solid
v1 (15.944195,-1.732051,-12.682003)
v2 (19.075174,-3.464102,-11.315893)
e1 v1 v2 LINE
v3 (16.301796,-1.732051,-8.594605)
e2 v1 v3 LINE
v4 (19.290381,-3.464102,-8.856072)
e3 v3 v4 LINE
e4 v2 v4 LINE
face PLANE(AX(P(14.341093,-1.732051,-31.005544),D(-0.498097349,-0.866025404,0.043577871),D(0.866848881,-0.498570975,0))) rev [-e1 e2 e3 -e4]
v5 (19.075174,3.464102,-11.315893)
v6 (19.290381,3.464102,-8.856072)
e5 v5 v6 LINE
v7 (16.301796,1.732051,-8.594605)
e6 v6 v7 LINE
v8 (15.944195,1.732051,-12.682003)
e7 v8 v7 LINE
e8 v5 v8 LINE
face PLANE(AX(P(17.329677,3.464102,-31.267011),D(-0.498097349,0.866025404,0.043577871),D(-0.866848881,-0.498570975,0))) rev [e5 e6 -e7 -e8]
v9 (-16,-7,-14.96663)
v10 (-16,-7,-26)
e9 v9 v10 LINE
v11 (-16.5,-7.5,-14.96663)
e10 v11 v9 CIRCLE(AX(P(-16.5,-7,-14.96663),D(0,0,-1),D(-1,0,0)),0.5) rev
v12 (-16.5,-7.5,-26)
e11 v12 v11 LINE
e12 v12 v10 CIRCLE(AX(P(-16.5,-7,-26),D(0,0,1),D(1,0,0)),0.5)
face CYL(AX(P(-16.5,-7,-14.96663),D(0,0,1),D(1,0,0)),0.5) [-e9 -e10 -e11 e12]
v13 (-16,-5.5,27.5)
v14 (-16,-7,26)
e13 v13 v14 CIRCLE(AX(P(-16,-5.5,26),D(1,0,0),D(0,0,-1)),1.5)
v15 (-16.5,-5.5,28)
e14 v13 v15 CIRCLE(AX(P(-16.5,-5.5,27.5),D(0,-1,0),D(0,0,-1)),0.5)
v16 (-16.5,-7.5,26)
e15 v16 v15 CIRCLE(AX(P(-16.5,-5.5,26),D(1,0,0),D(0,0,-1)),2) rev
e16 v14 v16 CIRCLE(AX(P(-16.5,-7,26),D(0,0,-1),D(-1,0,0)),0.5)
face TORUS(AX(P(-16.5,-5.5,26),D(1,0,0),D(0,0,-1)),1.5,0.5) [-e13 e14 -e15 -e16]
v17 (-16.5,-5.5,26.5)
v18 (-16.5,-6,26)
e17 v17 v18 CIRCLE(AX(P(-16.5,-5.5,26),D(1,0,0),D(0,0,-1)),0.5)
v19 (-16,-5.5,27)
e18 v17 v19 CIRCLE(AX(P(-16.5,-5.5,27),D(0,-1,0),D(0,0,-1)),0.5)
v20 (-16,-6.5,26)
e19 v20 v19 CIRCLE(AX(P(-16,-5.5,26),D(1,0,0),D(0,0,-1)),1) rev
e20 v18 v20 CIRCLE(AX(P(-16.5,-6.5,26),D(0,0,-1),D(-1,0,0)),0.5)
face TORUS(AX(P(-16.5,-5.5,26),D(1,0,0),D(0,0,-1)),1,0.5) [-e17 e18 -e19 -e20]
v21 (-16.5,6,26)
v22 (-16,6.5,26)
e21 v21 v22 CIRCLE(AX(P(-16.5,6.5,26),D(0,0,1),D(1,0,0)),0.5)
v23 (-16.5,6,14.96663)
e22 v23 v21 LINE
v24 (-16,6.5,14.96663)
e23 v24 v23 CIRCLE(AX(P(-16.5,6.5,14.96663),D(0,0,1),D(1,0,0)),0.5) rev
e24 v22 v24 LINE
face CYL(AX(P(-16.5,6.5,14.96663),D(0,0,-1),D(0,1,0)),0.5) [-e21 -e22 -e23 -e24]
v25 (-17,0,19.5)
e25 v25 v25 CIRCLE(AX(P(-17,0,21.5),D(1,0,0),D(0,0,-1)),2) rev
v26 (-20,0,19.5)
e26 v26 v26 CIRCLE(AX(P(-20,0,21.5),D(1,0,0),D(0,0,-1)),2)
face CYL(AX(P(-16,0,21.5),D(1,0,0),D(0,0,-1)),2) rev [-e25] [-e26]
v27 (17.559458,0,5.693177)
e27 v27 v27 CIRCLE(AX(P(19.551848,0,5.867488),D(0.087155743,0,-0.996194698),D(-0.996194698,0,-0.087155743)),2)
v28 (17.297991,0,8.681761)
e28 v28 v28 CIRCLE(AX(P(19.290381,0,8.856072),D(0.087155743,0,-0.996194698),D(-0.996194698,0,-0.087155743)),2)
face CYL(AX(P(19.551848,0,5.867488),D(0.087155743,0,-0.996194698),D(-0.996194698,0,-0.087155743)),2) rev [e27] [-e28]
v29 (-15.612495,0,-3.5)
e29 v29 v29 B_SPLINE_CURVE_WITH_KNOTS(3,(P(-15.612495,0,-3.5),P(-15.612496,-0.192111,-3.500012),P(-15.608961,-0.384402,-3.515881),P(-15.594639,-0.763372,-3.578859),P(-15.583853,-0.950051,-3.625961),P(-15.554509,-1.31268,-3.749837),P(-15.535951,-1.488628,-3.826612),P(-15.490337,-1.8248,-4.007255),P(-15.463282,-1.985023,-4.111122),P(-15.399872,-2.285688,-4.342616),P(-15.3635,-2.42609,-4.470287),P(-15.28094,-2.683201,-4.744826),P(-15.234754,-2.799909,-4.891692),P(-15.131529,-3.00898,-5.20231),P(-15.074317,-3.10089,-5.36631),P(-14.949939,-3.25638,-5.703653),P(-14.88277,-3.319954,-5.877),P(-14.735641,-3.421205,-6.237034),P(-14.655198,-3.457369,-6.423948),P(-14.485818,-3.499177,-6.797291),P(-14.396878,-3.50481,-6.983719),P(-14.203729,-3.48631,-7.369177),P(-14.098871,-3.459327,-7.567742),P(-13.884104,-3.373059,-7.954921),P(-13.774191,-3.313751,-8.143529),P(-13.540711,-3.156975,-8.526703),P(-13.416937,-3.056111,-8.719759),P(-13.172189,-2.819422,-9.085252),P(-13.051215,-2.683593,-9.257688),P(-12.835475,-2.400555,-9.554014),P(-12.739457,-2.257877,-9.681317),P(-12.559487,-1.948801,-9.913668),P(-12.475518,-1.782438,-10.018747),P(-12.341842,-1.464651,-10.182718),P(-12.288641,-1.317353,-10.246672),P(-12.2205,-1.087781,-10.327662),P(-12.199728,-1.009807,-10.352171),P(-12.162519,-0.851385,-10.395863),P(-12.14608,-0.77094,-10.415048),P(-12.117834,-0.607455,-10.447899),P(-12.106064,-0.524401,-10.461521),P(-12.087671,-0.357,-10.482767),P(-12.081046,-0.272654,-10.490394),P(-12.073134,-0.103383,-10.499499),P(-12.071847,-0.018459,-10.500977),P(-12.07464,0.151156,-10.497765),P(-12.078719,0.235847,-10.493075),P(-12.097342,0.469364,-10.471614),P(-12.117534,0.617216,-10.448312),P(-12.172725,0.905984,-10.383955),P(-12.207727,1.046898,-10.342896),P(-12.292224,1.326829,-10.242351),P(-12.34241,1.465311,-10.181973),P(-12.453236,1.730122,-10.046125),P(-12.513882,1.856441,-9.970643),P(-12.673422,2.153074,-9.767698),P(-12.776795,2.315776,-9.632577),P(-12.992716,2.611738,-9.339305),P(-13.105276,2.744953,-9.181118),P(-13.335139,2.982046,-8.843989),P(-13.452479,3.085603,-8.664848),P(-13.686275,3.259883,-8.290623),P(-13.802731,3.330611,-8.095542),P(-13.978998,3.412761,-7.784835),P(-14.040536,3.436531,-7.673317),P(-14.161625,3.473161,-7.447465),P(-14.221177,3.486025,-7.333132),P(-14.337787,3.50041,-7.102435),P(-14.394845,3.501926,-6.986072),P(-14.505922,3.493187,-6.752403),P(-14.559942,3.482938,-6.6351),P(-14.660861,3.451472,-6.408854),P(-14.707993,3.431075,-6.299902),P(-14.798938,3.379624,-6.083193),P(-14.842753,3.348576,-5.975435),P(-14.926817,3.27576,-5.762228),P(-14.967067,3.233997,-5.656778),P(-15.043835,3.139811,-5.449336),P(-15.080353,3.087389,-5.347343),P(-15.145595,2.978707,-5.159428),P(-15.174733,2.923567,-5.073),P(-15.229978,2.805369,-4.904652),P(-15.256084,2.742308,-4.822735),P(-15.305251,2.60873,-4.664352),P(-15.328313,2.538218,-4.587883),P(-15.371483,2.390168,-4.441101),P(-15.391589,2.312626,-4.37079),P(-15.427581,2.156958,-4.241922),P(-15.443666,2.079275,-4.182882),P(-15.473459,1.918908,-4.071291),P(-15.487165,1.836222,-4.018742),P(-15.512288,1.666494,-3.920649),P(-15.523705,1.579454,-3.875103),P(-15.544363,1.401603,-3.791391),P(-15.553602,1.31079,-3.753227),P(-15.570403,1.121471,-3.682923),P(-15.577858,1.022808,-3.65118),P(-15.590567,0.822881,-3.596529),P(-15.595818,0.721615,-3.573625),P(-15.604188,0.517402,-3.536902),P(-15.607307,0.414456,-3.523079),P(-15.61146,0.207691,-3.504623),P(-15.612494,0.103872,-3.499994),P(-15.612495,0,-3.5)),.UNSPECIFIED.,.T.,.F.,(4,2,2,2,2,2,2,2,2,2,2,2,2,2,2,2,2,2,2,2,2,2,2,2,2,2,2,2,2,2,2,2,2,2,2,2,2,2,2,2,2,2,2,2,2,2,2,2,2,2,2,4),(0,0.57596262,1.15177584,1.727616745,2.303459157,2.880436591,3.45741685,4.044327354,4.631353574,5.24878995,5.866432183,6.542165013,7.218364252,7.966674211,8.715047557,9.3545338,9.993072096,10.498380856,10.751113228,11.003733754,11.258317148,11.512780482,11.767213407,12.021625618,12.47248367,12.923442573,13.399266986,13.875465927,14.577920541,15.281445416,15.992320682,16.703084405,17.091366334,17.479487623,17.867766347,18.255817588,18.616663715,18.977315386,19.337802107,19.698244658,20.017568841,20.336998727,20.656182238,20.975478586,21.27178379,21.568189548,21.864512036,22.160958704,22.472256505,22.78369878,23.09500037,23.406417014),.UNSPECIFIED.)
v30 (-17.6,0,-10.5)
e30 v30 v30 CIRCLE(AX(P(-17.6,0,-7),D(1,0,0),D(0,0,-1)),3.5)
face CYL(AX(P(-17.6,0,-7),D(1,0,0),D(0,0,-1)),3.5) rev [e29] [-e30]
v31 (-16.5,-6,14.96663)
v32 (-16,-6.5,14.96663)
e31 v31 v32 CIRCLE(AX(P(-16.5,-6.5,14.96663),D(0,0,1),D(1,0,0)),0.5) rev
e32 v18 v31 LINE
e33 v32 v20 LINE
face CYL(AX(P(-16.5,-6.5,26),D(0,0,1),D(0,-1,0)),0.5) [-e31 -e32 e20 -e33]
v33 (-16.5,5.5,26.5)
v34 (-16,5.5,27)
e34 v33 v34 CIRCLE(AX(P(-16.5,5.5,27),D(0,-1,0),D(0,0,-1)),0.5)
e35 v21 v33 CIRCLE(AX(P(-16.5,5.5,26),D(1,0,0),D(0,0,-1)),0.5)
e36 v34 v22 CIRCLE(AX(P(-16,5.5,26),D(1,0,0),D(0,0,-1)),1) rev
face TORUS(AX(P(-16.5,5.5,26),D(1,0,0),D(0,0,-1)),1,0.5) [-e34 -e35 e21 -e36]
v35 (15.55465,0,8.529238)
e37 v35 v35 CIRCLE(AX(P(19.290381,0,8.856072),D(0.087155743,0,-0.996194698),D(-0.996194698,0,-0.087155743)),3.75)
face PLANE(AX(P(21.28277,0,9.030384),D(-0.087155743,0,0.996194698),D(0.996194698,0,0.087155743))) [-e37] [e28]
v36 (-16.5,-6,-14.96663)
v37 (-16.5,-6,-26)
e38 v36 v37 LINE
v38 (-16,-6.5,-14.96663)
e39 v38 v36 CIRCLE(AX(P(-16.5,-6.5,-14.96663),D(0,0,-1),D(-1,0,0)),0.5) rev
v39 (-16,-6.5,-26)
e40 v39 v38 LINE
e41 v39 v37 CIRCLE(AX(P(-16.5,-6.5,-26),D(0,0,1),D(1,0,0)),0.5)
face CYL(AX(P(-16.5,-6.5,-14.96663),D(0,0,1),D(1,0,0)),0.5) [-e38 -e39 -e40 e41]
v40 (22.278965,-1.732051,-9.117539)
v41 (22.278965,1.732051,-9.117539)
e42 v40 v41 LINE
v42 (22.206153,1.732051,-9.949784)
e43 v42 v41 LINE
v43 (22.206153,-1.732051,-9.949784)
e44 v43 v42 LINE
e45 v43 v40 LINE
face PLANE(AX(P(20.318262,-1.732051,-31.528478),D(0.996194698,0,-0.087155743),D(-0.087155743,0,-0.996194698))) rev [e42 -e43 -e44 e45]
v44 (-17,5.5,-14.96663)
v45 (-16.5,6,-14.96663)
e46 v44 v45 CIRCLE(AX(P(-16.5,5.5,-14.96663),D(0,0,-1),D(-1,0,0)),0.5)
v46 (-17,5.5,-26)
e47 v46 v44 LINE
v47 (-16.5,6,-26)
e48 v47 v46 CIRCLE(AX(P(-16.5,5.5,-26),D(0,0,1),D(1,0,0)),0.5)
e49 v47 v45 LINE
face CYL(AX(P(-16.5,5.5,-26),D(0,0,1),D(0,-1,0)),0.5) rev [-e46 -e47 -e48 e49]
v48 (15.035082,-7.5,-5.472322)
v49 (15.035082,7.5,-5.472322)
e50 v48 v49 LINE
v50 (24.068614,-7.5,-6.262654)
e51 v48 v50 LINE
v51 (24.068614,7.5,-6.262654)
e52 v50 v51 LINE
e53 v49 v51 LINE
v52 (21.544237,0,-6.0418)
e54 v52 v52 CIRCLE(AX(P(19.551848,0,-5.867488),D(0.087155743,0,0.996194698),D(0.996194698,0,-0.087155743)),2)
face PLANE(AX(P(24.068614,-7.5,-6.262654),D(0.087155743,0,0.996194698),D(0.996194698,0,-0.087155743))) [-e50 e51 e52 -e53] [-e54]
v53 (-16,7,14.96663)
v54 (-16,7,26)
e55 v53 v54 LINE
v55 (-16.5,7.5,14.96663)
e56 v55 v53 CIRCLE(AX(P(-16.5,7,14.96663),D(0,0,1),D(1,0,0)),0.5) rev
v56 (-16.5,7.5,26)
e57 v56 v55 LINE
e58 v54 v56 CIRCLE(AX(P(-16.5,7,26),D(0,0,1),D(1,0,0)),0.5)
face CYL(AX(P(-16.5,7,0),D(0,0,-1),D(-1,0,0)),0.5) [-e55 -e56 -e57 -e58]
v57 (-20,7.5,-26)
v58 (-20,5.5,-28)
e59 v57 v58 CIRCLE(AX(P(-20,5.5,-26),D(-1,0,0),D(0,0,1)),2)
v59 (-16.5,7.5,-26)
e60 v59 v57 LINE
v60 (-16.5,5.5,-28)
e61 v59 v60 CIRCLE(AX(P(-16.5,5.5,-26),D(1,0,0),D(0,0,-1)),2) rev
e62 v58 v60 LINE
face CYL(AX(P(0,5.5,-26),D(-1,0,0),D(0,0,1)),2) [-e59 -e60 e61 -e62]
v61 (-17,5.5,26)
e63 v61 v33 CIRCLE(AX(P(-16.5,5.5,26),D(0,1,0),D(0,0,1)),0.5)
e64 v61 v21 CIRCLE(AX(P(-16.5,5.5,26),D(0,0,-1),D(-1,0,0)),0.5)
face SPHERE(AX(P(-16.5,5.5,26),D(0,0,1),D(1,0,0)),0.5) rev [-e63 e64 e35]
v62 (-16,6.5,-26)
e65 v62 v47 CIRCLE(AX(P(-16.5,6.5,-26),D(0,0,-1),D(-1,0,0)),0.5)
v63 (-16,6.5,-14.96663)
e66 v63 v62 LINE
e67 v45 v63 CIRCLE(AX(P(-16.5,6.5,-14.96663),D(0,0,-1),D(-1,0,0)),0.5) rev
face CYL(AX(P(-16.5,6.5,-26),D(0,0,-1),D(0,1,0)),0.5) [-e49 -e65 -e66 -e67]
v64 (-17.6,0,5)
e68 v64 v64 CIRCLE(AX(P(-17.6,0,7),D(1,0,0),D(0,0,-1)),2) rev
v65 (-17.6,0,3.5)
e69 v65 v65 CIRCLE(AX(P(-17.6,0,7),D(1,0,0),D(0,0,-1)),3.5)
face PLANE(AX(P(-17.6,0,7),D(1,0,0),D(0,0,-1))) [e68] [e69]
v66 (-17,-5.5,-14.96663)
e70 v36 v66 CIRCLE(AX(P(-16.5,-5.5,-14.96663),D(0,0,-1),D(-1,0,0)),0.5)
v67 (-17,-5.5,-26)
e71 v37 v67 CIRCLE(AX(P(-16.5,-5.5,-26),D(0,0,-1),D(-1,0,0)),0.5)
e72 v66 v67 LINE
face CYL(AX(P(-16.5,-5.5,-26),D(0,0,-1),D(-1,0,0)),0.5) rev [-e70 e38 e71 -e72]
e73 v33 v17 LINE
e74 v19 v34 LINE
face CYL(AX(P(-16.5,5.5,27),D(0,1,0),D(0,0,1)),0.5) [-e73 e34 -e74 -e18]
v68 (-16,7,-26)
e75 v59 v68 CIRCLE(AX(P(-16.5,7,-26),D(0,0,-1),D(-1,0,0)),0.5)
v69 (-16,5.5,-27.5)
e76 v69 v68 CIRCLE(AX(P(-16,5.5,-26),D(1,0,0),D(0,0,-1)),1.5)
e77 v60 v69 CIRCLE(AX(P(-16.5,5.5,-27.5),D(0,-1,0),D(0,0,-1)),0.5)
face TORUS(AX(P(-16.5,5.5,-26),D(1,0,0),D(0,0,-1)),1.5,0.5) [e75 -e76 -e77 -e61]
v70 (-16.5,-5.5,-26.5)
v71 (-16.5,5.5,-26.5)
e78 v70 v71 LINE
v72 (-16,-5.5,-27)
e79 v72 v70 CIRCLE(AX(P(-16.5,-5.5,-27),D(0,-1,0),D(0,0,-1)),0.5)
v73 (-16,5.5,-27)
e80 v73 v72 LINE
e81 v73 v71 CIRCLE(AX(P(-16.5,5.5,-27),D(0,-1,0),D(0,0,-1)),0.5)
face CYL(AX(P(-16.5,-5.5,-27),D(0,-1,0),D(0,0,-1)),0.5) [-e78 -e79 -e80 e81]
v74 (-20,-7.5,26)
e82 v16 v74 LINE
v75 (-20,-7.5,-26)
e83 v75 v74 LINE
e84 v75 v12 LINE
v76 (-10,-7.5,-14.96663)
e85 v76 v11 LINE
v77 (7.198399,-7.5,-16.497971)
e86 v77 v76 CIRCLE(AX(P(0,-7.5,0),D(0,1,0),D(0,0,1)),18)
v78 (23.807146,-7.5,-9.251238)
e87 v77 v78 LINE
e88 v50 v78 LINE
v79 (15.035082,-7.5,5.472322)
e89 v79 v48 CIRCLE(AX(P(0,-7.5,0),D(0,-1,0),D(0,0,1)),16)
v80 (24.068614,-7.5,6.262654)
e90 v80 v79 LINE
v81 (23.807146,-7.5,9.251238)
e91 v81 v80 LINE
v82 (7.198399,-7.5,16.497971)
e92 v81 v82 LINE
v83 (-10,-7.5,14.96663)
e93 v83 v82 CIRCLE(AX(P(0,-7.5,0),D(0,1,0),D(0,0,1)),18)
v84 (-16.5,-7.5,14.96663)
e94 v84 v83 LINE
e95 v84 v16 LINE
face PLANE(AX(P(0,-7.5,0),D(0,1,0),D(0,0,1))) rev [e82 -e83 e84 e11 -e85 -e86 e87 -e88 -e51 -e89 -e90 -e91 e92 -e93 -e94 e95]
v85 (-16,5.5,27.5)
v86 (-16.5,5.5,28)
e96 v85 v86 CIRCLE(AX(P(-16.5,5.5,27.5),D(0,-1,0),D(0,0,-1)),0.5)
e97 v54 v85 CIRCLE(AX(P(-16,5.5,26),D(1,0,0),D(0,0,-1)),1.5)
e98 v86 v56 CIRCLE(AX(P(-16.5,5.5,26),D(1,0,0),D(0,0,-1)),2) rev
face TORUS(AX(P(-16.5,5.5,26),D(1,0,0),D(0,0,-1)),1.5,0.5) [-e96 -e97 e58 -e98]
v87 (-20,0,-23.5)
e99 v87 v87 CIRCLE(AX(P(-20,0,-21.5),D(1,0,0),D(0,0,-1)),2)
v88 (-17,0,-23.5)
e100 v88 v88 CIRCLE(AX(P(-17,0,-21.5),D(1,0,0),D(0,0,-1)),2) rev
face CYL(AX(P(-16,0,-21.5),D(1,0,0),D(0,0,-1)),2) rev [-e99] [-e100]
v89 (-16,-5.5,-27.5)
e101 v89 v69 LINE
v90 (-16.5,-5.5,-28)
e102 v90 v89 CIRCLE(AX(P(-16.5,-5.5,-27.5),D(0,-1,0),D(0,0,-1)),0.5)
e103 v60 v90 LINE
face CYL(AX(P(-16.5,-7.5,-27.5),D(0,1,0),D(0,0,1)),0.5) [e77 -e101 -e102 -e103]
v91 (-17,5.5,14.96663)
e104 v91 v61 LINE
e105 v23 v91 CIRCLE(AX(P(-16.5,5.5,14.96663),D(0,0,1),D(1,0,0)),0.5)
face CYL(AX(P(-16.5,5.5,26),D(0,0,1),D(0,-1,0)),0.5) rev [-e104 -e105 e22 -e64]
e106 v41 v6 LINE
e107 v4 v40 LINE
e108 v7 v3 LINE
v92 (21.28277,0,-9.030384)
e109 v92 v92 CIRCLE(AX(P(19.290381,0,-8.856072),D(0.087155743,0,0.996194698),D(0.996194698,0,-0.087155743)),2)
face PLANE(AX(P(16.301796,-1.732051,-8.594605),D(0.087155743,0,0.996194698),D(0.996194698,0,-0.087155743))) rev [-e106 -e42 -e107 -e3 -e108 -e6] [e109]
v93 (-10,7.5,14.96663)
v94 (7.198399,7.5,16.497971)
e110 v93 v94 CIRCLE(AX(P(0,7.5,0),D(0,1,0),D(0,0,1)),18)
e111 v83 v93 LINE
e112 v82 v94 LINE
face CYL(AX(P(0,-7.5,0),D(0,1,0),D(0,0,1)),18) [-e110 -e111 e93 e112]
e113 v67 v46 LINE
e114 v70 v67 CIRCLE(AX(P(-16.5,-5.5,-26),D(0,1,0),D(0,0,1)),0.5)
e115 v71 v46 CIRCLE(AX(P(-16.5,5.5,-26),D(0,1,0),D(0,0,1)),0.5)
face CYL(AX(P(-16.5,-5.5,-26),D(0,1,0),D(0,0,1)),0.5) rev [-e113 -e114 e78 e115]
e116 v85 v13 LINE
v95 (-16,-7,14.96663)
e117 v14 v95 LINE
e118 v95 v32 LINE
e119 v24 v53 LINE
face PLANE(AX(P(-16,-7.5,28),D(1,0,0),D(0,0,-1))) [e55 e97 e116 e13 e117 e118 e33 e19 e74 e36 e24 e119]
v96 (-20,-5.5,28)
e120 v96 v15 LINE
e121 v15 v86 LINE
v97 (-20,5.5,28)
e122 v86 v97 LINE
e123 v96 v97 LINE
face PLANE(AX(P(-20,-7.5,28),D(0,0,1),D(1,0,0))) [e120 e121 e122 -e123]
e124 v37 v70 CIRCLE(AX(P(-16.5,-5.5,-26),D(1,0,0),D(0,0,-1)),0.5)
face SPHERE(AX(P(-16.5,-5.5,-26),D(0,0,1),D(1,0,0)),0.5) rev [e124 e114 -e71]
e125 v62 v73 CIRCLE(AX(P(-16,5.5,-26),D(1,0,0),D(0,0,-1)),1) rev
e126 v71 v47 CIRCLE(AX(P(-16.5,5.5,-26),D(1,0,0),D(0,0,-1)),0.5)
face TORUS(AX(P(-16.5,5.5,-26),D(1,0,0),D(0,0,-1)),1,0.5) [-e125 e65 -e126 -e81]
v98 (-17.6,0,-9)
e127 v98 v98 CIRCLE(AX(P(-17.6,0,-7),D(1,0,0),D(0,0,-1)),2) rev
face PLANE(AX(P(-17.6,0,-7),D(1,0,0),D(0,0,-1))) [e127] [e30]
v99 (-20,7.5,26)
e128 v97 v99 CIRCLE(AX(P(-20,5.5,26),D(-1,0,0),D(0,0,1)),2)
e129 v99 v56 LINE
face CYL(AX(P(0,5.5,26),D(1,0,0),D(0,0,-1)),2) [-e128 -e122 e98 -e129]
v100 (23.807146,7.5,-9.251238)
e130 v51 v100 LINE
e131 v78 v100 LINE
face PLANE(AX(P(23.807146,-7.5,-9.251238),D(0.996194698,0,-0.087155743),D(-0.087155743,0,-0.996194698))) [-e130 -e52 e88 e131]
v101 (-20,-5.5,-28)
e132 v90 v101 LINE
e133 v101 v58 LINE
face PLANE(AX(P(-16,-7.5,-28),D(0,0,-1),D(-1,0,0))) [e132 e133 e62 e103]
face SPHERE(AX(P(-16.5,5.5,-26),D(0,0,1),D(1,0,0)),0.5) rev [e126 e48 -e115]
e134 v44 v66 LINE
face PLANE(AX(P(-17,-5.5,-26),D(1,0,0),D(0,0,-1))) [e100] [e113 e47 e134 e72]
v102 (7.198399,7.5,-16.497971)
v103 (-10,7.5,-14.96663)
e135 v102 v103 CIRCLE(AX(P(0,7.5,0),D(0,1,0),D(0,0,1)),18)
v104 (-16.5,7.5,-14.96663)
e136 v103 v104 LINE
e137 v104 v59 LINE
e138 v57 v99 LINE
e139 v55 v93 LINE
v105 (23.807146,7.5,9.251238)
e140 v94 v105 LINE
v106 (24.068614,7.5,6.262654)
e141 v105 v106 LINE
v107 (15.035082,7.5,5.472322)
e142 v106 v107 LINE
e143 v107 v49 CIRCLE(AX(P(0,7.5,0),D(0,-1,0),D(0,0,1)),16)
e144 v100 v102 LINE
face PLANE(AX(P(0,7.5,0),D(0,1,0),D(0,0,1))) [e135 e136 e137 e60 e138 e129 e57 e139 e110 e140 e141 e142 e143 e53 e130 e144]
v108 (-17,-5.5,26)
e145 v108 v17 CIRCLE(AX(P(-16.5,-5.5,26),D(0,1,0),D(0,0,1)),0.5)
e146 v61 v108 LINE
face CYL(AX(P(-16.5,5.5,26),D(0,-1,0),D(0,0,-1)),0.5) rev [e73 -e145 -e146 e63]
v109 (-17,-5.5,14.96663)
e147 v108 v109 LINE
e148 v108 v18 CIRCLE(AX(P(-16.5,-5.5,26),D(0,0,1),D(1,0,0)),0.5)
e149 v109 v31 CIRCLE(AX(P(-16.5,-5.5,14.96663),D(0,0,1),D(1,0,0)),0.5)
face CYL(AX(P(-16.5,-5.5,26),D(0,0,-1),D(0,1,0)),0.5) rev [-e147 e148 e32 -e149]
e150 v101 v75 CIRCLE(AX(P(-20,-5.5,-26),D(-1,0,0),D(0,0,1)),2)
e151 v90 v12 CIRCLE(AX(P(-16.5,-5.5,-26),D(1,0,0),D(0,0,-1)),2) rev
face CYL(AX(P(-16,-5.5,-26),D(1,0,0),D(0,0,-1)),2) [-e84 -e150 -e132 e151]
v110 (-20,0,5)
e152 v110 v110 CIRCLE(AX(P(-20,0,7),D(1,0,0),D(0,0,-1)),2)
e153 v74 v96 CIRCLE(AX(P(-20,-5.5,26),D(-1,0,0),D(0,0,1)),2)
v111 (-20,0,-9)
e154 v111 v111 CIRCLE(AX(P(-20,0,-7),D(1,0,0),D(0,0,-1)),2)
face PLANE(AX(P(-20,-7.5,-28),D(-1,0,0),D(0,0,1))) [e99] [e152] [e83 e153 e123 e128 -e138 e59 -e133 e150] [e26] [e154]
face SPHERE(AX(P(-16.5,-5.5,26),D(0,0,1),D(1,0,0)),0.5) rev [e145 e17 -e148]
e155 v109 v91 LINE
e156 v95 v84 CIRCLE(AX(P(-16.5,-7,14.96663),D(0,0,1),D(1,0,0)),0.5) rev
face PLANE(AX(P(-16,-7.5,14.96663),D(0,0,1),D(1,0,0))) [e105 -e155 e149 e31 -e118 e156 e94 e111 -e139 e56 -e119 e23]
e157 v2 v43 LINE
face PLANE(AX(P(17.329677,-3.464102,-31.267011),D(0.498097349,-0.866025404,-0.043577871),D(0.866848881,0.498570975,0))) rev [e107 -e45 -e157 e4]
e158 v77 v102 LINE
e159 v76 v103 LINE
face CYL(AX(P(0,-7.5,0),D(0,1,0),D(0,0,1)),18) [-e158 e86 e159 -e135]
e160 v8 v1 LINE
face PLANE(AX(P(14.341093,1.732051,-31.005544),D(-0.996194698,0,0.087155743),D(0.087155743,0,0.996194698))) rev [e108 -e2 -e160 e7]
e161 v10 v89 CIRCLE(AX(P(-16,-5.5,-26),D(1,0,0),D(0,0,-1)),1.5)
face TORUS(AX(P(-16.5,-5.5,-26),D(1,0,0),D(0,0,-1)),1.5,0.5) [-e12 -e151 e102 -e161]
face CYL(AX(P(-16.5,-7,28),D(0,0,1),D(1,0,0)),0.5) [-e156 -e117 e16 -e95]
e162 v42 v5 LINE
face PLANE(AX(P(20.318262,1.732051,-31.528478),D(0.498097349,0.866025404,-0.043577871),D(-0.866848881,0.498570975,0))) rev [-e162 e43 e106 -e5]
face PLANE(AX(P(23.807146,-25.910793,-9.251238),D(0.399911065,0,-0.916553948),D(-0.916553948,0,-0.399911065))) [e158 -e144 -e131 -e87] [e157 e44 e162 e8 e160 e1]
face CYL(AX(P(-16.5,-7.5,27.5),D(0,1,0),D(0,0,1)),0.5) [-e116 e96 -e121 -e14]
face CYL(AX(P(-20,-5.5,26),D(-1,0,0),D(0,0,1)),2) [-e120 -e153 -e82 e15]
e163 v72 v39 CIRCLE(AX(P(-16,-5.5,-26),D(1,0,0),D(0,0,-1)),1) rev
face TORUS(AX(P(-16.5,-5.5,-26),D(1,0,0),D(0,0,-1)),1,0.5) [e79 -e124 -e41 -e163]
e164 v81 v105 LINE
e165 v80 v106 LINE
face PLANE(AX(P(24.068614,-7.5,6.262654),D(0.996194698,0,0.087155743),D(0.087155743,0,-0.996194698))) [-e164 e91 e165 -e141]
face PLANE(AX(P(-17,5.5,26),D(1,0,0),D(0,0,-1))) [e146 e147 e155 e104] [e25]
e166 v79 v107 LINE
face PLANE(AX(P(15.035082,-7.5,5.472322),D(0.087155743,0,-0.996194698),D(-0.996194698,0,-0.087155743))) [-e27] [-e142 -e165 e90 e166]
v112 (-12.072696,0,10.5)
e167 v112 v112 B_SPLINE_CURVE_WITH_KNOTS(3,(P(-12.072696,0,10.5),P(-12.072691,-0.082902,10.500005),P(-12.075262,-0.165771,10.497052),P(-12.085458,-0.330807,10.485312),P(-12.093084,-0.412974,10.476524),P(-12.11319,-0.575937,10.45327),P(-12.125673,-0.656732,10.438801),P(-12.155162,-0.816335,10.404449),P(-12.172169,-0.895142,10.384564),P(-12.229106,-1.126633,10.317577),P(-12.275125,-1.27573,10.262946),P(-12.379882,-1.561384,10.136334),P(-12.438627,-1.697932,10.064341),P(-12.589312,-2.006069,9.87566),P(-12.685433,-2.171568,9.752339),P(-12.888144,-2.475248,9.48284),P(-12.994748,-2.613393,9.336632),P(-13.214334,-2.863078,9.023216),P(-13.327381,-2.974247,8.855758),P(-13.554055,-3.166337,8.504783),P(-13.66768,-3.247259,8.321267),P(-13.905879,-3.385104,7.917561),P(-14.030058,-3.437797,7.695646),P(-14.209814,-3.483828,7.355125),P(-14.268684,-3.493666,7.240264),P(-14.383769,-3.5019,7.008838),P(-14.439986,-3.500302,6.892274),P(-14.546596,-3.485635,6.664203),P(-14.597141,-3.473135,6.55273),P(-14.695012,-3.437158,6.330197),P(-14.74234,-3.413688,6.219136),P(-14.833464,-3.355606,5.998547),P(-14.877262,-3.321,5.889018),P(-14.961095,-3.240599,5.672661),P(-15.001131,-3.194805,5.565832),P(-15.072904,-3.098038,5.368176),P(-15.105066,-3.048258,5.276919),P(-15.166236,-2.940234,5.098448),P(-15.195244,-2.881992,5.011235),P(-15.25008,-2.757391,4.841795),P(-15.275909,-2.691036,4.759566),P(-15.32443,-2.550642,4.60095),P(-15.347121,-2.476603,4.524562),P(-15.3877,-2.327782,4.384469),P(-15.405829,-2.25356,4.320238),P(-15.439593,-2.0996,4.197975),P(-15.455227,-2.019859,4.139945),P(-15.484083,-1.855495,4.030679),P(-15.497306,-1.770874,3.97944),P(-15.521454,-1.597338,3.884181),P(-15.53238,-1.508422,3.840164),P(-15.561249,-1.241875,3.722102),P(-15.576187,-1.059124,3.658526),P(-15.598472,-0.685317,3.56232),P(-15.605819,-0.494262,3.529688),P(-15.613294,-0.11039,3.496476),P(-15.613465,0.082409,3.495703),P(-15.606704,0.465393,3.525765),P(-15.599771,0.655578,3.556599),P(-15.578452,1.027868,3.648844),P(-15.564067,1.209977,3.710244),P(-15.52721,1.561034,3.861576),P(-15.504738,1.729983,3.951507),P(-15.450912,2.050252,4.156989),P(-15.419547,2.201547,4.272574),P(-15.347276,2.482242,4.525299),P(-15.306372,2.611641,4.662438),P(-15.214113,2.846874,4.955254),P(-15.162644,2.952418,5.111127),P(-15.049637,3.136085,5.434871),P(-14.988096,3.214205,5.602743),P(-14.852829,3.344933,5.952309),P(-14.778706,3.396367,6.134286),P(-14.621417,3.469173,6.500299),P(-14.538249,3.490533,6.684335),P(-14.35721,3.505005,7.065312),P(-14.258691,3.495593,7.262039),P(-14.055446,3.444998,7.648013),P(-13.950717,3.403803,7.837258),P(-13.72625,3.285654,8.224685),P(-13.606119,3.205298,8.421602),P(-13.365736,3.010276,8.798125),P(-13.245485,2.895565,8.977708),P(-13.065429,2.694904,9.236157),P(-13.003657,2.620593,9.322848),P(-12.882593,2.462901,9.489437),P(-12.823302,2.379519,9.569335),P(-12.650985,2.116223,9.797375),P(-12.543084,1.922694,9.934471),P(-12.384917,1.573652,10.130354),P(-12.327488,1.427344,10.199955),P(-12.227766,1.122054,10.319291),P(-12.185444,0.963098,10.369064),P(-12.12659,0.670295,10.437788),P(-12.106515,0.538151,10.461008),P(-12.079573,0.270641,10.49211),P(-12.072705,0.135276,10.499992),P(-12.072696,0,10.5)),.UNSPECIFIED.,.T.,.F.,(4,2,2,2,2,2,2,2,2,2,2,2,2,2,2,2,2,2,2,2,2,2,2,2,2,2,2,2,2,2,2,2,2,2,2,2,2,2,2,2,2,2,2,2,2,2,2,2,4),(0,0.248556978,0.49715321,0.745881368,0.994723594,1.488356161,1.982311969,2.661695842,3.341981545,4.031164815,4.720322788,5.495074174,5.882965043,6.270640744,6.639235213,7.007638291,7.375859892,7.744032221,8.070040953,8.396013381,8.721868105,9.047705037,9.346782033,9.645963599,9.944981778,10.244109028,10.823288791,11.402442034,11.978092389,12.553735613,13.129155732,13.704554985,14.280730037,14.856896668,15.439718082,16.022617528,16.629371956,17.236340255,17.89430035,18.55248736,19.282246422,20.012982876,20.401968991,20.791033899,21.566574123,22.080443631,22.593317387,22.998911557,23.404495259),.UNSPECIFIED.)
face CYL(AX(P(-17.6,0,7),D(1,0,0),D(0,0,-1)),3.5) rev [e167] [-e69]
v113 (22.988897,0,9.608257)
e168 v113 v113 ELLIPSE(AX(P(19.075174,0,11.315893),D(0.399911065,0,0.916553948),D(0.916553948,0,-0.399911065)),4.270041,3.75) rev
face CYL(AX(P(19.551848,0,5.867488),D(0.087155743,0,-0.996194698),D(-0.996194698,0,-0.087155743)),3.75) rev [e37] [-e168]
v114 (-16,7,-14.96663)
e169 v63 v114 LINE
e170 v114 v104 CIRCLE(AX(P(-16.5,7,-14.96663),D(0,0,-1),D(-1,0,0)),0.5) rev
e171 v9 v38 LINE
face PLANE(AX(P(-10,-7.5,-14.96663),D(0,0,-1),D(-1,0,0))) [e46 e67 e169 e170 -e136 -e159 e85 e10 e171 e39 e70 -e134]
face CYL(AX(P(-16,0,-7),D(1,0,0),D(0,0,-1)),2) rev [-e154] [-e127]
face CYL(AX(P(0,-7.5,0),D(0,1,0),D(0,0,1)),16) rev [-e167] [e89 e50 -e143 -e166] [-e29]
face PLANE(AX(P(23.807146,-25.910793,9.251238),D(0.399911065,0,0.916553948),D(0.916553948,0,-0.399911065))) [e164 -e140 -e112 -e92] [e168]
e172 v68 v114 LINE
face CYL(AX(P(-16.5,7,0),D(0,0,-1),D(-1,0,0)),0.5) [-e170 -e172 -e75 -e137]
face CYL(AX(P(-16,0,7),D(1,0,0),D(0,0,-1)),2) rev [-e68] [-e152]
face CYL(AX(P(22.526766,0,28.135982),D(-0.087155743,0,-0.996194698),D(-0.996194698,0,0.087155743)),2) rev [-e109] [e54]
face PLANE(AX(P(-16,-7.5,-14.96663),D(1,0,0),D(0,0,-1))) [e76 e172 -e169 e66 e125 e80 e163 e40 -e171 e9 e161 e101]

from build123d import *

# Parameters (mm, degrees)
BOSS_EXTRUDE1_DEPTH               = 7.5
BOSS_EXTRUDE1_DEPTH_BACK          = 7.5
SKETCH4_W                         = 2
SKETCH4_H                         = 4
F_4_0_4_DIAMETER_HOLE1_AT_2_COUNT = 2
F_4_0_4_DIAMETER_HOLE1_AT_2_PITCH = 43
F_4_0_4_DIAMETER_HOLE1_AT_3_COUNT = 2
F_4_0_4_DIAMETER_HOLE1_AT_3_PITCH = 14.5
F_4_0_4_DIAMETER_HOLE1_AT_4_COUNT = 2
F_4_0_4_DIAMETER_HOLE1_AT_4_PITCH = 28.5
FILLET1_R                         = 2
CUT_EXTRUDE1_DEPTH                = 1
CUT_EXTRUDE5_REACH                = 52.268
CUT_EXTRUDE5_END_RADIUS           = 16
SKETCH15_R                        = 3.5
CUT_EXTRUDE5_DIRECTION_2_DEPTH    = 0.6
FILLET2_R                         = 0.5
BOSS_EXTRUDE2_START               = -7.5
BOSS_EXTRUDE2_DEPTH               = 15
CUT_EXTRUDE6_REACH                = 45.576
SKETCH17_R                        = 2
CUT_EXTRUDE7_REACH                = 45.576


with BuildPart() as part:
    # Sketch1 → Boss-Extrude1 (new, two sides: drawn at the far end of the back side and taken through both)
    with BuildSketch(Plane(origin=(0, 0, 0), x_dir=(1, 0, 0), z_dir=(0, 1, 0)).offset(-BOSS_EXTRUDE1_DEPTH_BACK)):
        with BuildLine():
            Line((-16, 14.966629547), (-16, 28))
            Line((-16, 28), (-20, 28))
            Line((-20, 28), (-20, -28))
            Line((-20, -28), (-16, -28))
            Line((-16, -28), (-16, -14.966629547))
            Line((-16, -14.966629547), (-10, -14.966629547))
            ThreePointArc((-10, -14.966629547), (4.335878308, -17.469978801), (15.837588826, -8.553992061))
            Line((15.837588826, -8.553992061), (23.80714641, -9.251238003))
            Line((23.80714641, -9.251238003), (24.068613639, -6.262653909))
            Line((24.068613639, -6.262653909), (15.035081933, -5.472322293))
            ThreePointArc((15.035081933, -5.472322293), (-16, 0), (15.035081933, 5.472322293))
            Line((15.035081933, 5.472322293), (24.068613639, 6.262653909))
            Line((24.068613639, 6.262653909), (23.80714641, 9.251238003))
            Line((23.80714641, 9.251238003), (15.837588826, 8.553992061))
            ThreePointArc((15.837588826, 8.553992061), (4.335878308, 17.469978801), (-10, 14.966629547))
            Line((-10, 14.966629547), (-16, 14.966629547))
        make_face()
    extrude(amount=BOSS_EXTRUDE1_DEPTH + BOSS_EXTRUDE1_DEPTH_BACK)

    # Sketch4 → Ø4.0 (4) Diameter Hole1 (revolve, cut)
    with BuildSketch(Plane(origin=(-16, 0, 21.5), x_dir=(0, 0, -1), z_dir=(0, 1, 0))):
        with Locations((1, 2)):
            Rectangle(SKETCH4_W, SKETCH4_H)
    f_4_0_4_diameter_hole1 = revolve(axis=Axis((-9.65, 0, 21.5), (-1, 0, 0)), mode=Mode.SUBTRACT)

    # Ø4.0 (4) Diameter Hole1 at 2: Ø4.0 (4) Diameter Hole1 ×2
    with Locations(*[(0, 0, -i * F_4_0_4_DIAMETER_HOLE1_AT_2_PITCH) for i in range(1, F_4_0_4_DIAMETER_HOLE1_AT_2_COUNT)]):
        add(f_4_0_4_diameter_hole1, mode=Mode.SUBTRACT)

    # Ø4.0 (4) Diameter Hole1 at 3: Ø4.0 (4) Diameter Hole1 ×2
    with Locations(*[(0, 0, -i * F_4_0_4_DIAMETER_HOLE1_AT_3_PITCH) for i in range(1, F_4_0_4_DIAMETER_HOLE1_AT_3_COUNT)]):
        add(f_4_0_4_diameter_hole1, mode=Mode.SUBTRACT)

    # Ø4.0 (4) Diameter Hole1 at 4: Ø4.0 (4) Diameter Hole1 ×2
    with Locations(*[(0, 0, -i * F_4_0_4_DIAMETER_HOLE1_AT_4_PITCH) for i in range(1, F_4_0_4_DIAMETER_HOLE1_AT_4_COUNT)]):
        add(f_4_0_4_diameter_hole1, mode=Mode.SUBTRACT)

    # Fillet1
    fillet1_edges = [part.edges().sort_by_distance(p)[0] for p in [
        (-18, -7.5, -28),
        (-18, -7.5, 28),
        (-18, 7.5, -28),
        (-18, 7.5, 28),
    ]]
    fillet(fillet1_edges, radius=FILLET1_R)

    # Sketch10 → Cut-Extrude1 (cut)
    with BuildSketch(Plane(origin=(-16, 0, 0), x_dir=(0, 0, -1), z_dir=(1, 0, 0))):
        with BuildLine():
            Line((14.966629547, 6), (14.966629547, -6))
            Line((14.966629547, -6), (26, -6))
            ThreePointArc((26, -6), (26.353553391, -5.853553391), (26.5, -5.5))
            Line((26.5, -5.5), (26.5, 5.5))
            ThreePointArc((26.5, 5.5), (26.353553391, 5.853553391), (26, 6))
            Line((26, 6), (14.966629547, 6))
        make_face()
        with BuildLine():
            Line((-14.966629547, 6), (-14.966629547, -6))
            Line((-14.966629547, -6), (-26, -6))
            ThreePointArc((-26, -6), (-26.353553391, -5.853553391), (-26.5, -5.5))
            Line((-26.5, -5.5), (-26.5, 5.5))
            ThreePointArc((-26.5, 5.5), (-26.353553391, 5.853553391), (-26, 6))
            Line((-26, 6), (-14.966629547, 6))
        make_face()
    extrude(amount=-CUT_EXTRUDE1_DEPTH, mode=Mode.SUBTRACT)

    # Cut-Extrude5: up to this cylinder (the profile starts outside it)
    cut_extrude5_end = Plane(origin=(0, 0, 0), z_dir=(0, 1, 0)) * Cylinder(CUT_EXTRUDE5_END_RADIUS, 137.536, mode=Mode.PRIVATE)
    # Sketch15 → Cut-Extrude5 (cut, up to the surface)
    with BuildSketch(Plane(origin=(-17, 0, 0), x_dir=(0, 0, -1), z_dir=(1, 0, 0)), mode=Mode.PRIVATE) as cut_extrude5_sk1:
        with Locations((7, 0)):
            Circle(SKETCH15_R)
    cut_extrude5_tool1 = extrude(cut_extrude5_sk1.sketch, amount=CUT_EXTRUDE5_REACH, mode=Mode.PRIVATE) - cut_extrude5_end
    add(cut_extrude5_tool1.solids().sort_by_distance((-17, 0, -7))[0], mode=Mode.SUBTRACT)
    # Sketch15 → Cut-Extrude5 (cut, up to the surface)
    with BuildSketch(Plane(origin=(-17, 0, 0), x_dir=(0, 0, -1), z_dir=(1, 0, 0)), mode=Mode.PRIVATE) as cut_extrude5_sk2:
        with Locations((-7, 0)):
            Circle(SKETCH15_R)
    cut_extrude5_tool2 = extrude(cut_extrude5_sk2.sketch, amount=CUT_EXTRUDE5_REACH, mode=Mode.PRIVATE) - cut_extrude5_end
    add(cut_extrude5_tool2.solids().sort_by_distance((-17, 0, 7))[0], mode=Mode.SUBTRACT)

    # Sketch15 → Cut-Extrude5 direction 2 (cut)
    with BuildSketch(Plane(origin=(-17, 0, 0), x_dir=(0, 0, -1), z_dir=(1, 0, 0))):
        with Locations((7, 0)):
            Circle(SKETCH15_R)
        with Locations((-7, 0)):
            Circle(SKETCH15_R)
    extrude(amount=-CUT_EXTRUDE5_DIRECTION_2_DEPTH, mode=Mode.SUBTRACT)

    # Fillet2
    fillet2_edges = [part.edges().sort_by_distance(p)[0] for p in [
        (-17, -6, -20.483314774),
        (-17, -5.853553391, -26.353553391),
        (-17, 0, -26.5),
        (-17, 5.853553391, -26.353553391),
        (-16, -6, -20.483314774),
        (-16, -5.853553391, -26.353553391),
        (-16, 6, -20.483314774),
        (-16, 5.853553391, -26.353553391),
        (-16, -7.5, -20.483314774),
        (-16, -6.914213562, -27.414213562),
        (-16, 7.5, -20.483314774),
        (-16, 6.914213562, -27.414213562),
        (-16, -7.5, 20.483314774),
        (-16, -6.914213562, 27.414213562),
        (-16, 0, 28),
        (-16, 6.914213562, 27.414213562),
        (-17, -6, 20.483314774),
        (-17, -5.853553391, 26.353553391),
        (-17, 0, 26.5),
        (-17, 5.853553391, 26.353553391),
        (-16, -6, 20.483314774),
        (-16, -5.853553391, 26.353553391),
        (-16, 0, 26.5),
        (-16, 5.853553391, 26.353553391),
        (-17, 6, -20.483314774),
        (-16, 0, -26.5),
        (-16, 0, -28),
        (-16, 7.5, 20.483314774),
        (-17, 6, 20.483314774),
        (-16, 6, 20.483314774),
    ]]
    fillet(fillet2_edges, radius=FILLET2_R - 0.0001)  # a hair under: the kernel refuses the full size

    # Sketch11 → Boss-Extrude2 (add)
    with BuildSketch(Plane(origin=(0, 0, 0), x_dir=(1, 0, 0), z_dir=(0, 1, 0)).offset(BOSS_EXTRUDE2_START)):
        with BuildLine():
            Line((23.80714641, -9.251238003), (7.198399175, -16.497971066))
            ThreePointArc((7.198399175, -16.497971066), (12.183631905, -13.24987221), (15.837588826, -8.553992061))
            Line((15.837588826, -8.553992061), (23.80714641, -9.251238003))
        make_face()
        with BuildLine():
            Line((23.80714641, 9.251238003), (7.198399175, 16.497971066))
            ThreePointArc((7.198399175, 16.497971066), (12.183631905, 13.24987221), (15.837588826, 8.553992061))
            Line((15.837588826, 8.553992061), (23.80714641, 9.251238003))
        make_face()
    extrude(amount=BOSS_EXTRUDE2_DEPTH)

    # Sketch16 → Cut-Revolve1 (revolve, cut)
    with BuildSketch(Plane(origin=(0, 0, 0), x_dir=(1, 0, 0), z_dir=(0, 1, 0)), mode=Mode.PRIVATE) as cut_revolve1_sk:
        Polygon((19.551847786, -5.867488101), (21.544237182, -6.041799587), (21.282769954, -9.030383681), (23.026110675, -9.182906231), (22.079695592, -20.000480134), (18.343965474, -19.673646099), align=None)
    revolve(cut_revolve1_sk.sketch.rotate(Axis((19.551847786, 0, 5.867488101), (-0.08715574274765382, 0, 0.996194698091746)), 180), axis=Axis((19.551847786, 0, 5.867488101), (-0.08715574274765382, 0, 0.996194698091746)), mode=Mode.SUBTRACT)

    # Sketch17 → Cut-Extrude6 (cut, up to next)
    with BuildSketch(Plane(origin=(-0.622388286, 0, -7.113930662), x_dir=(0.996194698091746, 0, -0.08715574274765478), z_dir=(0.08715574274765478, 0, 0.996194698091746)), mode=Mode.PRIVATE) as cut_extrude6_sk1:
        with Locations((19.988832385, 0)):
            Circle(SKETCH17_R)
    cut_extrude6_tool1 = extrude(cut_extrude6_sk1.sketch, amount=CUT_EXTRUDE6_REACH, mode=Mode.PRIVATE) & part.part
    add(cut_extrude6_tool1.solids().sort_by_distance((19.290381, 0, -8.856072))[0], mode=Mode.SUBTRACT)

    # Cut-Extrude7: up to this plane
    cut_extrude7_end = Plane(origin=(23.80714641, -25.910792681, -9.251238003), z_dir=(0.39991106530273124, 0, -0.9165539481385887))
    # Sketch18 → Cut-Extrude7 (cut, up to the surface)
    with BuildSketch(Plane(origin=(-0.622388286, 0, -7.113930662), x_dir=(0.996194698091746, 0, -0.08715574274765478), z_dir=(0.08715574274765478, 0, 0.996194698091746)), mode=Mode.PRIVATE) as cut_extrude7_sk1:
        Polygon((16.988832385, -1.732050808), (19.988832385, -3.464101615), (22.988832385, -1.732050808), (22.988832385, 1.732050808), (19.988832385, 3.464101615), (16.988832385, 1.732050808), align=None)
    cut_extrude7_tool1 = split(extrude(cut_extrude7_sk1.sketch, amount=-CUT_EXTRUDE7_REACH, mode=Mode.PRIVATE), bisect_by=cut_extrude7_end, keep=Keep.BOTH, mode=Mode.PRIVATE)
    add(cut_extrude7_tool1.solids().sort_by_distance((19.290381, 0, -8.856072))[0], mode=Mode.SUBTRACT)


solid = part.part
